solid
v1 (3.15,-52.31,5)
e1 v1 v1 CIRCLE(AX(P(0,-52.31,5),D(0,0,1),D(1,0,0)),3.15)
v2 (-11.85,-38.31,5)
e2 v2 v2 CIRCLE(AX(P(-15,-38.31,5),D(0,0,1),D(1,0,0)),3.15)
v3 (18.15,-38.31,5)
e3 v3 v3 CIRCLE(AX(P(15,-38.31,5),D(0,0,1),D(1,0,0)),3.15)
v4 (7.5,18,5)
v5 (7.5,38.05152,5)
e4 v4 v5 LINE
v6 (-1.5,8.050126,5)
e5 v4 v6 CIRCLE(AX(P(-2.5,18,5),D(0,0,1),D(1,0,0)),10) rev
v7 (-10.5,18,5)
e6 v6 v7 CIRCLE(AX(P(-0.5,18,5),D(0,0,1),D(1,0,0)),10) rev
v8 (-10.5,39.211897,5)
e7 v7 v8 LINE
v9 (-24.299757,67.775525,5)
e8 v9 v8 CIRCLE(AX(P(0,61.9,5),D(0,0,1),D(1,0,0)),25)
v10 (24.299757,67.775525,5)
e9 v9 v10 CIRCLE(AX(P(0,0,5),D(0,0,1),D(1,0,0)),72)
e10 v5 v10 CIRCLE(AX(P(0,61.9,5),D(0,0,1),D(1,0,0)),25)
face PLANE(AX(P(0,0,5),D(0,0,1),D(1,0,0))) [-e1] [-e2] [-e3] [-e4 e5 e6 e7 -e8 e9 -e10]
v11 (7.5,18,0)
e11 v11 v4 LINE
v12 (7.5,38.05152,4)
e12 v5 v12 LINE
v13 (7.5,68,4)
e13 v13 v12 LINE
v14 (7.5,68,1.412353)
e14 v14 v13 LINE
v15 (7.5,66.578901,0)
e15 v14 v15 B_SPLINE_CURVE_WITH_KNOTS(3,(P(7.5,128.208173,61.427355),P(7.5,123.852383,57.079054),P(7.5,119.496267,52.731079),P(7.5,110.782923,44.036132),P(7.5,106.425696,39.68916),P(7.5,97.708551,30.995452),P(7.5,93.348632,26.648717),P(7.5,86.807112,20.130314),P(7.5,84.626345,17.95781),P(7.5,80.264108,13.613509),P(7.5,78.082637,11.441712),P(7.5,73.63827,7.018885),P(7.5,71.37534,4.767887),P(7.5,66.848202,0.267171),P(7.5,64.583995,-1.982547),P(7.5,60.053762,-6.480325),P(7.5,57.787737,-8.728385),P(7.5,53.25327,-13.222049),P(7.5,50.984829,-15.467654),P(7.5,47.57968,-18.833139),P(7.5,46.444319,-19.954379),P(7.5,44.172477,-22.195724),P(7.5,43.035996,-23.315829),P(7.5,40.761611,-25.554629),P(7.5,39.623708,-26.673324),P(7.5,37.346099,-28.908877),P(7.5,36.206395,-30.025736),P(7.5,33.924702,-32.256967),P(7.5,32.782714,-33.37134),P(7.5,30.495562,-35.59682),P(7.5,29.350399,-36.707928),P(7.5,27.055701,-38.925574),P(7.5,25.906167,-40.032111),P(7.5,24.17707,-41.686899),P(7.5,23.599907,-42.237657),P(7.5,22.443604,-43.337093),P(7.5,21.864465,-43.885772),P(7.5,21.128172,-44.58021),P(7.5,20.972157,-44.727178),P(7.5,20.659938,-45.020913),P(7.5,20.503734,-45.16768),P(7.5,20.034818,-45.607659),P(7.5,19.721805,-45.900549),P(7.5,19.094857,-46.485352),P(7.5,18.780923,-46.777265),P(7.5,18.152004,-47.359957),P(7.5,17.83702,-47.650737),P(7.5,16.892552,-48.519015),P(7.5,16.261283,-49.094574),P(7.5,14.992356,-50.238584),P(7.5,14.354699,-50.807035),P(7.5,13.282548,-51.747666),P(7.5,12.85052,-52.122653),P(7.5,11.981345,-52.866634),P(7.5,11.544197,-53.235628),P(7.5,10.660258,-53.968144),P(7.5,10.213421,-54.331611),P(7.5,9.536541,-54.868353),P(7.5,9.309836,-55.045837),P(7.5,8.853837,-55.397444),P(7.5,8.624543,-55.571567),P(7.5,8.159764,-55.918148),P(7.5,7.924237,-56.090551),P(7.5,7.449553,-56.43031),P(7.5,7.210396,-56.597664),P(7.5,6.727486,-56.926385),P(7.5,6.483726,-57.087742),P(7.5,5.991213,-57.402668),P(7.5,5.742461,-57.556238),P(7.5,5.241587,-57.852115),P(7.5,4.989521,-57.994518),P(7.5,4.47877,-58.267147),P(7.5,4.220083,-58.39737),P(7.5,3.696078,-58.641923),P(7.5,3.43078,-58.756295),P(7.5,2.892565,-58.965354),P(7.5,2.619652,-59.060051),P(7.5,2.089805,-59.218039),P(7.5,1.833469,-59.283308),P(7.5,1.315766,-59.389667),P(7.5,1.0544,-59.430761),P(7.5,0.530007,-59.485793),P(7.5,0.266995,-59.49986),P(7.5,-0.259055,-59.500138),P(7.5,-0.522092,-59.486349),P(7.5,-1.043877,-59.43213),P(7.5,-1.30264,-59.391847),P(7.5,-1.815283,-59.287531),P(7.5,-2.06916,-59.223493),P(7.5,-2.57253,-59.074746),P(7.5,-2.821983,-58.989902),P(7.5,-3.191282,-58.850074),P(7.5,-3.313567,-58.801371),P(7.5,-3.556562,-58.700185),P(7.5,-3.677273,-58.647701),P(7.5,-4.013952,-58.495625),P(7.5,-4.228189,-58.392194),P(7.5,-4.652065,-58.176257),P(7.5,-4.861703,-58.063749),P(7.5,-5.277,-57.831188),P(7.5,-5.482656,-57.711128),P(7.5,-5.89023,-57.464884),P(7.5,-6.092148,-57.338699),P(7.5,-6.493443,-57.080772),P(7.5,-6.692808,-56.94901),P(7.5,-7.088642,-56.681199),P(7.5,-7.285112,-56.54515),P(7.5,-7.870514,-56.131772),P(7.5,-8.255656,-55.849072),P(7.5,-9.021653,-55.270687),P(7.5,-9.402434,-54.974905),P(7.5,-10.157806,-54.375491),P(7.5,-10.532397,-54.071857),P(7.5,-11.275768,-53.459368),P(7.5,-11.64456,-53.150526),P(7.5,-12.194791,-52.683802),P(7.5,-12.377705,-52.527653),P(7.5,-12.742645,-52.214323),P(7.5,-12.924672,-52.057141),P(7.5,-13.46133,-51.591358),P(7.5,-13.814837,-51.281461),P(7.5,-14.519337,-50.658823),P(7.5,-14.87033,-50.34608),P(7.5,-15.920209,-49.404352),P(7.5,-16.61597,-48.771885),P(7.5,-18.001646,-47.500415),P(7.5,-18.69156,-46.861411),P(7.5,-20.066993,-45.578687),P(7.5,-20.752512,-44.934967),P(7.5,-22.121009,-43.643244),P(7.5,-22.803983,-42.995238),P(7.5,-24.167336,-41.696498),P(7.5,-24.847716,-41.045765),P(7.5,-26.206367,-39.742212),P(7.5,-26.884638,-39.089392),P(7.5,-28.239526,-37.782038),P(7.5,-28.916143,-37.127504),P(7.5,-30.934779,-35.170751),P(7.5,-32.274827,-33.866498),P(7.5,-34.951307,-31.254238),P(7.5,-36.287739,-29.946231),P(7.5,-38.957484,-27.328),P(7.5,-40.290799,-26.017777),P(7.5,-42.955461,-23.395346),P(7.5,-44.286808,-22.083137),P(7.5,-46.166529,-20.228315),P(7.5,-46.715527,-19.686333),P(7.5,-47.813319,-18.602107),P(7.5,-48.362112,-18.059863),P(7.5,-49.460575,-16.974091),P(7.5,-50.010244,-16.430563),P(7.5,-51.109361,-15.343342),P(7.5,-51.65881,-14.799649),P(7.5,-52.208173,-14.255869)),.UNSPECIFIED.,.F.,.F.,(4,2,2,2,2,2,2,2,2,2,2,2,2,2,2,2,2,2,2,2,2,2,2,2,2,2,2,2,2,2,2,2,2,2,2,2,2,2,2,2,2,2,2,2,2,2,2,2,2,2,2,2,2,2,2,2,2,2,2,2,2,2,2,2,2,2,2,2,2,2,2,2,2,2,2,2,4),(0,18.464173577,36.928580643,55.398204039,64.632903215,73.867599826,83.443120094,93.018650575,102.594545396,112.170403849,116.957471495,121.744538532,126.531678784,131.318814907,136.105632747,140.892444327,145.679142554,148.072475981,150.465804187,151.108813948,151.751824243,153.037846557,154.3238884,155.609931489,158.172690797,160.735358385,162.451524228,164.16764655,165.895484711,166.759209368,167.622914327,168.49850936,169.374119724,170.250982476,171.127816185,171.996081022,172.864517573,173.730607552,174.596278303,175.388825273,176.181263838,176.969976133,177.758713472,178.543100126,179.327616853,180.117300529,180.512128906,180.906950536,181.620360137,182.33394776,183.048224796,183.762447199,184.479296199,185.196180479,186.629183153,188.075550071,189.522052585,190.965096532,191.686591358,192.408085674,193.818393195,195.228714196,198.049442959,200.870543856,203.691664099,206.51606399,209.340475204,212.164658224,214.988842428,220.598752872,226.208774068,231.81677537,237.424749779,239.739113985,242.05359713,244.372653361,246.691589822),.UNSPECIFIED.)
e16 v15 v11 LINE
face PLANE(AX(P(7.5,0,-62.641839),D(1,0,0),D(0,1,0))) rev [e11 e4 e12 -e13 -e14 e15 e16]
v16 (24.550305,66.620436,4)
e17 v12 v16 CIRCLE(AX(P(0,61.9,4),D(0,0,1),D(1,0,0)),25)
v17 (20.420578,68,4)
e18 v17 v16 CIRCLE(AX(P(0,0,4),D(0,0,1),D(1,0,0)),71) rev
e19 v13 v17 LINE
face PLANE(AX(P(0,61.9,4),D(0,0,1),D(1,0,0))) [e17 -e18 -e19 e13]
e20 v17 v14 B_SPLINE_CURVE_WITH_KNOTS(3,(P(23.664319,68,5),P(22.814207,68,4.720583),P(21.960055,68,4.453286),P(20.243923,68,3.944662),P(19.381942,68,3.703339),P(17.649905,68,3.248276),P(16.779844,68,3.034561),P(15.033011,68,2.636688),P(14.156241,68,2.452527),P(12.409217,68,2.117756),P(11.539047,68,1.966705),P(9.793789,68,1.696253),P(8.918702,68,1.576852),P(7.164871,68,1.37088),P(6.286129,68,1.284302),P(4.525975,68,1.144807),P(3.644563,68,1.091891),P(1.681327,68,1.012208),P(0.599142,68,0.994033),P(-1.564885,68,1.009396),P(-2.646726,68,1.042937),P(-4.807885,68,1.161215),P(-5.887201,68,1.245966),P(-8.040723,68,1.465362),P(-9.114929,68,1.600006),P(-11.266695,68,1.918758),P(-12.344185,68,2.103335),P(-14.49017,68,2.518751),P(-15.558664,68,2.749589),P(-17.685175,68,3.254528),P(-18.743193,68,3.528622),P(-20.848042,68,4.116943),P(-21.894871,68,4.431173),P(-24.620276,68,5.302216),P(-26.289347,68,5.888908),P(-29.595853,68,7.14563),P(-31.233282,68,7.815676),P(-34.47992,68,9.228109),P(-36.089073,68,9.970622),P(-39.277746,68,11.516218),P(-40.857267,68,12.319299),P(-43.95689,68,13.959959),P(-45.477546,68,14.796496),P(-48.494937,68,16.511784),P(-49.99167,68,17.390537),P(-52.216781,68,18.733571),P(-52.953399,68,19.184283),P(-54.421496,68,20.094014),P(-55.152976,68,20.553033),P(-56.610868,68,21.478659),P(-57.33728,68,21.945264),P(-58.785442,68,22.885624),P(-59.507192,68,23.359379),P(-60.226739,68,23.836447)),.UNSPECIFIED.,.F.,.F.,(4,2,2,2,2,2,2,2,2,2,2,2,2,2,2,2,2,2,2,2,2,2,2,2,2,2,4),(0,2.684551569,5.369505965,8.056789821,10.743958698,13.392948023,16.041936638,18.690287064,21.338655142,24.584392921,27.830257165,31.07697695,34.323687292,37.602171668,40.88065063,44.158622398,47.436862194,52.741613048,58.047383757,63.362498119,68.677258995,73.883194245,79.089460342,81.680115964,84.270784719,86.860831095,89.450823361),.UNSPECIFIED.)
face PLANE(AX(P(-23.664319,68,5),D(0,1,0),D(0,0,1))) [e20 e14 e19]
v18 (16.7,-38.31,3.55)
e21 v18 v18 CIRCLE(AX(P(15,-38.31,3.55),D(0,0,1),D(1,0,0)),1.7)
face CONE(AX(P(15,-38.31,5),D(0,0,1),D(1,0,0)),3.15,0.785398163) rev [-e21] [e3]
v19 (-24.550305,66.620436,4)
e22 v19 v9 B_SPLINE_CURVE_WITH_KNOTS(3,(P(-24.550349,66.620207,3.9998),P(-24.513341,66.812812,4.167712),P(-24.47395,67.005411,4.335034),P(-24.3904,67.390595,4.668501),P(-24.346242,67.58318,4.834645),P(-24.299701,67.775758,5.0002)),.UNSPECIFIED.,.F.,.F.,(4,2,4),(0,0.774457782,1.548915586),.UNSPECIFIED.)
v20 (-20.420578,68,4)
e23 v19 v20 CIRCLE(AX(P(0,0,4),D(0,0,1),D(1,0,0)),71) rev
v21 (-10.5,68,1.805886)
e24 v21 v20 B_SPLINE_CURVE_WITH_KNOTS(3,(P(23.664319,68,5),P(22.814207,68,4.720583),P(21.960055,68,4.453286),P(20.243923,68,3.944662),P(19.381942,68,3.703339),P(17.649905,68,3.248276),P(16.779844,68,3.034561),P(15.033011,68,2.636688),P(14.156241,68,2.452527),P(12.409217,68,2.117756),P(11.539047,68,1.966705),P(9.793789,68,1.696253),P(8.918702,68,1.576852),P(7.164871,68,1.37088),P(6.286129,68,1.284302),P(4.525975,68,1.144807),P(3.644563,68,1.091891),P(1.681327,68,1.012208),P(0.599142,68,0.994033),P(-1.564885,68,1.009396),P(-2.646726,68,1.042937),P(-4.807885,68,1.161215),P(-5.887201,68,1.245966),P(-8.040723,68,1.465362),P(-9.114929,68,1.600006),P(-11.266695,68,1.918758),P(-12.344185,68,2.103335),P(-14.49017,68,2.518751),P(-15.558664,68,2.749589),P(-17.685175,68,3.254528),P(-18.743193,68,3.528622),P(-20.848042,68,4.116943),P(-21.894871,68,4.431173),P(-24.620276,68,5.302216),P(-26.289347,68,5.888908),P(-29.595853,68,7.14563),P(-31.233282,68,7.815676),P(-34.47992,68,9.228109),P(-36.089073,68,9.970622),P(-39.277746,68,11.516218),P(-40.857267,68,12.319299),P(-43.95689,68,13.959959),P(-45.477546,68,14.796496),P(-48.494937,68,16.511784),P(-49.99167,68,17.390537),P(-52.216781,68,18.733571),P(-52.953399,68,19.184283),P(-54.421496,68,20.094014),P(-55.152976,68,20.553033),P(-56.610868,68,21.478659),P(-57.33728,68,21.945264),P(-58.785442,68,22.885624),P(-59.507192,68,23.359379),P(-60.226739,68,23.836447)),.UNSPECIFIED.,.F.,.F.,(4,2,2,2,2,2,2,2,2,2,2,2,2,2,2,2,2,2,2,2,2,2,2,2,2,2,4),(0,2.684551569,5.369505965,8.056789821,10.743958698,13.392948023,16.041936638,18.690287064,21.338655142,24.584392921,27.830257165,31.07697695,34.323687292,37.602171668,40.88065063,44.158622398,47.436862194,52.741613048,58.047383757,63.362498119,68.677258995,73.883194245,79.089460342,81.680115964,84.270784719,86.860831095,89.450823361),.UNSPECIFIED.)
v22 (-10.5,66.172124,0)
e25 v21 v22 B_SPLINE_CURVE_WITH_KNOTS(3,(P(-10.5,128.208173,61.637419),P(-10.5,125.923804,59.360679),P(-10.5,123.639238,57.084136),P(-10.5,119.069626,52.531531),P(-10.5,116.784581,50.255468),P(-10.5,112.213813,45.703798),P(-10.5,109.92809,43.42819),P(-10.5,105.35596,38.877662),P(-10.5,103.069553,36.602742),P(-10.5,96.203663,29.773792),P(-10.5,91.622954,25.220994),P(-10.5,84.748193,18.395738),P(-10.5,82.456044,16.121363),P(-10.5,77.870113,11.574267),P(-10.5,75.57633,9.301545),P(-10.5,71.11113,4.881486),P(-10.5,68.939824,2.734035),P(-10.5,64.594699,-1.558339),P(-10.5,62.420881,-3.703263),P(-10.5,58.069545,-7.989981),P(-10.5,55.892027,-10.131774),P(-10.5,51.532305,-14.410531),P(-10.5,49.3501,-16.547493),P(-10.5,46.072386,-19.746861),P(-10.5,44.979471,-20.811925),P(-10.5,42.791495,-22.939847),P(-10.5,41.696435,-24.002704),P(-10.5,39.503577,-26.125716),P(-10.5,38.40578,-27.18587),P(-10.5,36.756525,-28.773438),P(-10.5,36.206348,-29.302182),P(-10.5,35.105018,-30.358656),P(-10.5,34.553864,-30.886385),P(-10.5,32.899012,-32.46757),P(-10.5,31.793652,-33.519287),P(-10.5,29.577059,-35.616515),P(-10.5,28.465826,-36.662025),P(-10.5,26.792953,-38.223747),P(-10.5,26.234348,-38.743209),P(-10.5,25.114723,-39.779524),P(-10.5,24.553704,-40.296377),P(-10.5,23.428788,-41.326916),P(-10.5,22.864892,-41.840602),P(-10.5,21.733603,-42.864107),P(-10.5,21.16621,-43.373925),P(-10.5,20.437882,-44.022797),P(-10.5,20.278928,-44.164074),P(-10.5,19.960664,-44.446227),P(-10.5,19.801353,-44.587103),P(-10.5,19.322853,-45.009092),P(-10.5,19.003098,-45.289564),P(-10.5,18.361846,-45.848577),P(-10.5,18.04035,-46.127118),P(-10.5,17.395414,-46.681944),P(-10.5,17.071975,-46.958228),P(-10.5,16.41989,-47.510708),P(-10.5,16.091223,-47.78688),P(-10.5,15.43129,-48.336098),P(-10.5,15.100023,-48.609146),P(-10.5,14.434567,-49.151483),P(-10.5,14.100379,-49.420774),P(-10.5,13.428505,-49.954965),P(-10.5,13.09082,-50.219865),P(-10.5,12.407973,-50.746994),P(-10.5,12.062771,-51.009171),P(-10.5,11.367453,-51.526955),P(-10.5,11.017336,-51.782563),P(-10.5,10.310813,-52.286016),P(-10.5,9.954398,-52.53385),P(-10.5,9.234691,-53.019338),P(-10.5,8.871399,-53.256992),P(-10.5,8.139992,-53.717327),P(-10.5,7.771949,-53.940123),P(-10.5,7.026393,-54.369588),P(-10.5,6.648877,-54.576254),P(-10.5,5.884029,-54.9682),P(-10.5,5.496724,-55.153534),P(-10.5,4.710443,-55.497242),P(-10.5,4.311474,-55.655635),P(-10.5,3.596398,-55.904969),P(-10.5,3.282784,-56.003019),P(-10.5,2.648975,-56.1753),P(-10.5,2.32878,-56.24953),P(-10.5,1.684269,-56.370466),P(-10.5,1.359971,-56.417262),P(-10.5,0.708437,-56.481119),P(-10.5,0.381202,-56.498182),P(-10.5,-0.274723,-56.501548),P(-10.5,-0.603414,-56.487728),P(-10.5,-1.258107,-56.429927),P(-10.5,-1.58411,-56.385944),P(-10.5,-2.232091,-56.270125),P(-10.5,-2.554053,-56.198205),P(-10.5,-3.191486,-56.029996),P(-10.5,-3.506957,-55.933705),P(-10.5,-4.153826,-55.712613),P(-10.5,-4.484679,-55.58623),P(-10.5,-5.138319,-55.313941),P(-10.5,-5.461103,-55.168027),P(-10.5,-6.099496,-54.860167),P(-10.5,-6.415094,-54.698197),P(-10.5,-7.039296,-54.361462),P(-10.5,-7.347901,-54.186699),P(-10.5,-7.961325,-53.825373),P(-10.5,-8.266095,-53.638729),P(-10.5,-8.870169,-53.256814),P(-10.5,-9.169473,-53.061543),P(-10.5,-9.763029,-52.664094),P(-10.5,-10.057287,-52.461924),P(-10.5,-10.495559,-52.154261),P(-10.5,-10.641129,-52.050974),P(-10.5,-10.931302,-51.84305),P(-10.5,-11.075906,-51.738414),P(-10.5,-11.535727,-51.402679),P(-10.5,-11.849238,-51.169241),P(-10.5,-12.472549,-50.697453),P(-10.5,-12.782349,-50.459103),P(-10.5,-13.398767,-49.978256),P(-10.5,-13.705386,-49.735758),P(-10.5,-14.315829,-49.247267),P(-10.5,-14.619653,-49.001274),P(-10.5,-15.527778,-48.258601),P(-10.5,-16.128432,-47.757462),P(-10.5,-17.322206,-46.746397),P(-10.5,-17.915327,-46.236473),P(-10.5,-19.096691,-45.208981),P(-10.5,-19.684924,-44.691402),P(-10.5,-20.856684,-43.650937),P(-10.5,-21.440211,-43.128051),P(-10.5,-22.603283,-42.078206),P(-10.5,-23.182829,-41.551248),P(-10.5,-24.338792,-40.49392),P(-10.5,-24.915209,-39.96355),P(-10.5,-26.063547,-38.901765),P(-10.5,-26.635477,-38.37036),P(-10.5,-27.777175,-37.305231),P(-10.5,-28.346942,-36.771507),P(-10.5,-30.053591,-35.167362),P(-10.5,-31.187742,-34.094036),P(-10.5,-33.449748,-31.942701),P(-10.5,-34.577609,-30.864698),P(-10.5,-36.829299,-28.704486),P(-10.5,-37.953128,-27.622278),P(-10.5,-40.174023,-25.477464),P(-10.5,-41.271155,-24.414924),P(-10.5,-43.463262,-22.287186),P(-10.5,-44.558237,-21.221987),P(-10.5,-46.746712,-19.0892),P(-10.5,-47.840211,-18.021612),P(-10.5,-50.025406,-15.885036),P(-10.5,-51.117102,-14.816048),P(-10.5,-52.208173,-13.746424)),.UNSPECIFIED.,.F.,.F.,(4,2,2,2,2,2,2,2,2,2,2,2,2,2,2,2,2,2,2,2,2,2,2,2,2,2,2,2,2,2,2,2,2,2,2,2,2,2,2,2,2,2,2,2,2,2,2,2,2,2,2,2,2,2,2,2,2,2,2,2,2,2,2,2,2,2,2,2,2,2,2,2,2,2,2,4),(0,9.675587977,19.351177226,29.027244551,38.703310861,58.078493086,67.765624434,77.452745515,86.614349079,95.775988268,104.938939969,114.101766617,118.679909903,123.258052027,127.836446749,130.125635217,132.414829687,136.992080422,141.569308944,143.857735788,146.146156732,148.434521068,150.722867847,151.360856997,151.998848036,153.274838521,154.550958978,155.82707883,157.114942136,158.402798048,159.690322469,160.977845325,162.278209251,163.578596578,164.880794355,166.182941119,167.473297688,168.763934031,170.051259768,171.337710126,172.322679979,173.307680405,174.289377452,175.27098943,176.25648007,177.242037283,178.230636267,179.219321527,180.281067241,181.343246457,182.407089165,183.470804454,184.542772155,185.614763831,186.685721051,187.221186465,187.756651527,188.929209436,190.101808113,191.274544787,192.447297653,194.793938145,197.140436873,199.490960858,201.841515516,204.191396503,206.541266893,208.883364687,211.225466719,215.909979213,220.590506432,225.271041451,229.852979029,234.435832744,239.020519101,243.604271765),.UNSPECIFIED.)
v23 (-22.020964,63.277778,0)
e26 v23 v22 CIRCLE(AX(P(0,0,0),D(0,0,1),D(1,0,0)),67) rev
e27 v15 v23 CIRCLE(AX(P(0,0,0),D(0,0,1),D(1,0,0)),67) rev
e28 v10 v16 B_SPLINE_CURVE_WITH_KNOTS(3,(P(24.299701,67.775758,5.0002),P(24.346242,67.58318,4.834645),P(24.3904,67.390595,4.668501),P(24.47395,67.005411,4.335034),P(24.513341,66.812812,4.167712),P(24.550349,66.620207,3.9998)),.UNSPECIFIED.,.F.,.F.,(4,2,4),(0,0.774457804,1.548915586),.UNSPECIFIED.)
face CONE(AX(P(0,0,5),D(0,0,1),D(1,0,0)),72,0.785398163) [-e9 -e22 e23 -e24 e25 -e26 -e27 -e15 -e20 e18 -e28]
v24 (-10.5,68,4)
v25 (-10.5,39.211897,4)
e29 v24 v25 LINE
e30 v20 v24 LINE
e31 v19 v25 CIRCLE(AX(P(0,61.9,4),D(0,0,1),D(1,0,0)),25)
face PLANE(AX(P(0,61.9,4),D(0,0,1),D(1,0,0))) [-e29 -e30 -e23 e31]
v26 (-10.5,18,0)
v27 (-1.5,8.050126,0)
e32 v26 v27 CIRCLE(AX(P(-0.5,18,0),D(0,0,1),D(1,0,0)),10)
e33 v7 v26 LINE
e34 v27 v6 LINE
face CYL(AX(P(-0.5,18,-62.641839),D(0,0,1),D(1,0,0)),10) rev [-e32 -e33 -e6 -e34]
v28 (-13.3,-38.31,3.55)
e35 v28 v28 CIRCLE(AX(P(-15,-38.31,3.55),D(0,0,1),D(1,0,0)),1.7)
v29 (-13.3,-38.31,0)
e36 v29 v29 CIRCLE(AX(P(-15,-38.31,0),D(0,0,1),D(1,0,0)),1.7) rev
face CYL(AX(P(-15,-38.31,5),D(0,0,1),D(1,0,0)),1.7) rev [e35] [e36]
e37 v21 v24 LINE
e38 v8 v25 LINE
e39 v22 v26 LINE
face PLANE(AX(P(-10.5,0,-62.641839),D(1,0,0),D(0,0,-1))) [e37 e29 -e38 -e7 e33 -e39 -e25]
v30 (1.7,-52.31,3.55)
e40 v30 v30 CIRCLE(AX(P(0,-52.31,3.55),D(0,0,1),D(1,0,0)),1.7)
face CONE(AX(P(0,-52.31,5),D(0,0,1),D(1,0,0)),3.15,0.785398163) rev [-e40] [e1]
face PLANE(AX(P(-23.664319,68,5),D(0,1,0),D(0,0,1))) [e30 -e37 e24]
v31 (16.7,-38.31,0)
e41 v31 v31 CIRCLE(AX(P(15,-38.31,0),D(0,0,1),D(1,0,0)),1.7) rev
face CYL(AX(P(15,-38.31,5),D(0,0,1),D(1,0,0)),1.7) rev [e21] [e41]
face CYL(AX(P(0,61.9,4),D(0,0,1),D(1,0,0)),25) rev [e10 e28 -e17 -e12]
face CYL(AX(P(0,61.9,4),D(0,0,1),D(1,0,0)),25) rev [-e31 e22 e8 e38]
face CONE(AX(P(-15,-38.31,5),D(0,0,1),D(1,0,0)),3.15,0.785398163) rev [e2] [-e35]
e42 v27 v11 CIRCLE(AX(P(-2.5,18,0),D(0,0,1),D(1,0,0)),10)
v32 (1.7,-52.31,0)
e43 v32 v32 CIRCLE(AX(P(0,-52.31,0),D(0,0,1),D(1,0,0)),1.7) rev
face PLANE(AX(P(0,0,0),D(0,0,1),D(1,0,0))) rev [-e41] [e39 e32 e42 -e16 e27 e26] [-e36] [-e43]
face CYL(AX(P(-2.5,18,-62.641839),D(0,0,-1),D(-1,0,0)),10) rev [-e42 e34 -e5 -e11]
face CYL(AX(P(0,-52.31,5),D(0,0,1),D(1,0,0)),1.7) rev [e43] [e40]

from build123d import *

# Parameters (mm, degrees)
BOSS_EXTRUDE2_DEPTH                                 = 5
CSK_FOR_M3_COUNTERSUNK_FLAT_HEAD_SCREW1_D           = 3.4
CSK_FOR_M3_COUNTERSUNK_FLAT_HEAD_SCREW1_DEPTH       = 5
CSK_FOR_M3_COUNTERSUNK_FLAT_HEAD_SCREW1_CSINK_D     = 6.3
CSK_FOR_M3_COUNTERSUNK_FLAT_HEAD_SCREW1_CSINK_ANGLE = 90
CSK_FOR_M3_COUNTERSUNK_FLAT_HEAD_SCREW1_TIP         = 1.021463052
CUT_EXTRUDE1_REACH                                  = 103.946
SKETCH4_W                                           = 18
SKETCH4_H                                           = 60
SKETCH5_R                                           = 25
CUT_EXTRUDE2_DEPTH                                  = 1
FILLET1_R                                           = 10


with BuildPart() as part:
    # Sketch1 → Boss-Extrude2 (new body)
    with BuildSketch(Plane.XY):
        with BuildLine():
            Line((-23.664319132, 68), (23.664319132, 68))
            ThreePointArc((23.664319132, 68), (0, -72), (-23.664319132, 68))
        make_face()
    extrude(amount=BOSS_EXTRUDE2_DEPTH)

    # Chamfer1: read off the stored shape, not the designer's step
    # Chamfer1 outline → Chamfer1 (revolve, cut)
    with BuildSketch(Plane.XZ):
        Polygon((72.000000172, 5.000000172), (67, 0), (72.000000172, 0), align=None)
    revolve(axis=Axis((0, 0, 0), (0, 0, 1)), mode=Mode.SUBTRACT)

    # CSK for M3 Countersunk Flat Head Screw1
    with Locations(Plane.XY.offset(5)):
        with Locations((15, -38.31), (-15, -38.31), (0, -52.31)):
            CounterSinkHole(CSK_FOR_M3_COUNTERSUNK_FLAT_HEAD_SCREW1_D / 2, CSK_FOR_M3_COUNTERSUNK_FLAT_HEAD_SCREW1_CSINK_D / 2, depth=CSK_FOR_M3_COUNTERSUNK_FLAT_HEAD_SCREW1_DEPTH, counter_sink_angle=CSK_FOR_M3_COUNTERSUNK_FLAT_HEAD_SCREW1_CSINK_ANGLE)
            with Locations((0, 0, -(CSK_FOR_M3_COUNTERSUNK_FLAT_HEAD_SCREW1_DEPTH + CSK_FOR_M3_COUNTERSUNK_FLAT_HEAD_SCREW1_TIP / 2))):  # 118° drill point
                Cone(0, CSK_FOR_M3_COUNTERSUNK_FLAT_HEAD_SCREW1_D / 2, CSK_FOR_M3_COUNTERSUNK_FLAT_HEAD_SCREW1_TIP, mode=Mode.SUBTRACT)

    # Cut-Extrude1: up to this face of the body (flat: up to its plane)
    cut_extrude1_end = Plane(part.part.faces().sort_by_distance((0, 0.083165236, 0))[0])
    # Sketch4 → Cut-Extrude1 (cut, up to the picked face)
    with BuildSketch(Plane.XY.offset(5), mode=Mode.PRIVATE) as cut_extrude1_sk1:
        with Locations((-1.5, 38)):
            Rectangle(SKETCH4_W, SKETCH4_H)
    cut_extrude1_tool1 = split(extrude(cut_extrude1_sk1.sketch, amount=-CUT_EXTRUDE1_REACH, mode=Mode.PRIVATE), bisect_by=cut_extrude1_end, keep=Keep.BOTH, mode=Mode.PRIVATE)
    add(cut_extrude1_tool1.solids().sort_by(Axis((-1.5, 38, 5), (0, 0, -1)))[0], mode=Mode.SUBTRACT)

    # Sketch5 → Cut-Extrude2 (cut)
    with BuildSketch(Plane.XY.offset(5)):
        with Locations((0, 61.9)):
            Circle(SKETCH5_R)
    extrude(amount=-CUT_EXTRUDE2_DEPTH, mode=Mode.SUBTRACT)

    # Fillet1
    # the kernel refuses this fillet: 10 mm, written as the material it adds along each edge
    with BuildSketch(Plane(origin=(-10.5, 8, 5), x_dir=(1, 0, 0), z_dir=(0, 0, -1)), Plane(origin=(7.5, 8, 5), x_dir=(0, 1, 0), z_dir=(0, 0, -1))) as fillet1_piece_1:
        with BuildLine():
            CenterArc((FILLET1_R, -FILLET1_R), FILLET1_R, 90, 90)
            Line((0, -FILLET1_R), (0, 0))
            Line((0, 0), (FILLET1_R, 0))
        make_face()
    extrude(amount=5)


solid = part.part
